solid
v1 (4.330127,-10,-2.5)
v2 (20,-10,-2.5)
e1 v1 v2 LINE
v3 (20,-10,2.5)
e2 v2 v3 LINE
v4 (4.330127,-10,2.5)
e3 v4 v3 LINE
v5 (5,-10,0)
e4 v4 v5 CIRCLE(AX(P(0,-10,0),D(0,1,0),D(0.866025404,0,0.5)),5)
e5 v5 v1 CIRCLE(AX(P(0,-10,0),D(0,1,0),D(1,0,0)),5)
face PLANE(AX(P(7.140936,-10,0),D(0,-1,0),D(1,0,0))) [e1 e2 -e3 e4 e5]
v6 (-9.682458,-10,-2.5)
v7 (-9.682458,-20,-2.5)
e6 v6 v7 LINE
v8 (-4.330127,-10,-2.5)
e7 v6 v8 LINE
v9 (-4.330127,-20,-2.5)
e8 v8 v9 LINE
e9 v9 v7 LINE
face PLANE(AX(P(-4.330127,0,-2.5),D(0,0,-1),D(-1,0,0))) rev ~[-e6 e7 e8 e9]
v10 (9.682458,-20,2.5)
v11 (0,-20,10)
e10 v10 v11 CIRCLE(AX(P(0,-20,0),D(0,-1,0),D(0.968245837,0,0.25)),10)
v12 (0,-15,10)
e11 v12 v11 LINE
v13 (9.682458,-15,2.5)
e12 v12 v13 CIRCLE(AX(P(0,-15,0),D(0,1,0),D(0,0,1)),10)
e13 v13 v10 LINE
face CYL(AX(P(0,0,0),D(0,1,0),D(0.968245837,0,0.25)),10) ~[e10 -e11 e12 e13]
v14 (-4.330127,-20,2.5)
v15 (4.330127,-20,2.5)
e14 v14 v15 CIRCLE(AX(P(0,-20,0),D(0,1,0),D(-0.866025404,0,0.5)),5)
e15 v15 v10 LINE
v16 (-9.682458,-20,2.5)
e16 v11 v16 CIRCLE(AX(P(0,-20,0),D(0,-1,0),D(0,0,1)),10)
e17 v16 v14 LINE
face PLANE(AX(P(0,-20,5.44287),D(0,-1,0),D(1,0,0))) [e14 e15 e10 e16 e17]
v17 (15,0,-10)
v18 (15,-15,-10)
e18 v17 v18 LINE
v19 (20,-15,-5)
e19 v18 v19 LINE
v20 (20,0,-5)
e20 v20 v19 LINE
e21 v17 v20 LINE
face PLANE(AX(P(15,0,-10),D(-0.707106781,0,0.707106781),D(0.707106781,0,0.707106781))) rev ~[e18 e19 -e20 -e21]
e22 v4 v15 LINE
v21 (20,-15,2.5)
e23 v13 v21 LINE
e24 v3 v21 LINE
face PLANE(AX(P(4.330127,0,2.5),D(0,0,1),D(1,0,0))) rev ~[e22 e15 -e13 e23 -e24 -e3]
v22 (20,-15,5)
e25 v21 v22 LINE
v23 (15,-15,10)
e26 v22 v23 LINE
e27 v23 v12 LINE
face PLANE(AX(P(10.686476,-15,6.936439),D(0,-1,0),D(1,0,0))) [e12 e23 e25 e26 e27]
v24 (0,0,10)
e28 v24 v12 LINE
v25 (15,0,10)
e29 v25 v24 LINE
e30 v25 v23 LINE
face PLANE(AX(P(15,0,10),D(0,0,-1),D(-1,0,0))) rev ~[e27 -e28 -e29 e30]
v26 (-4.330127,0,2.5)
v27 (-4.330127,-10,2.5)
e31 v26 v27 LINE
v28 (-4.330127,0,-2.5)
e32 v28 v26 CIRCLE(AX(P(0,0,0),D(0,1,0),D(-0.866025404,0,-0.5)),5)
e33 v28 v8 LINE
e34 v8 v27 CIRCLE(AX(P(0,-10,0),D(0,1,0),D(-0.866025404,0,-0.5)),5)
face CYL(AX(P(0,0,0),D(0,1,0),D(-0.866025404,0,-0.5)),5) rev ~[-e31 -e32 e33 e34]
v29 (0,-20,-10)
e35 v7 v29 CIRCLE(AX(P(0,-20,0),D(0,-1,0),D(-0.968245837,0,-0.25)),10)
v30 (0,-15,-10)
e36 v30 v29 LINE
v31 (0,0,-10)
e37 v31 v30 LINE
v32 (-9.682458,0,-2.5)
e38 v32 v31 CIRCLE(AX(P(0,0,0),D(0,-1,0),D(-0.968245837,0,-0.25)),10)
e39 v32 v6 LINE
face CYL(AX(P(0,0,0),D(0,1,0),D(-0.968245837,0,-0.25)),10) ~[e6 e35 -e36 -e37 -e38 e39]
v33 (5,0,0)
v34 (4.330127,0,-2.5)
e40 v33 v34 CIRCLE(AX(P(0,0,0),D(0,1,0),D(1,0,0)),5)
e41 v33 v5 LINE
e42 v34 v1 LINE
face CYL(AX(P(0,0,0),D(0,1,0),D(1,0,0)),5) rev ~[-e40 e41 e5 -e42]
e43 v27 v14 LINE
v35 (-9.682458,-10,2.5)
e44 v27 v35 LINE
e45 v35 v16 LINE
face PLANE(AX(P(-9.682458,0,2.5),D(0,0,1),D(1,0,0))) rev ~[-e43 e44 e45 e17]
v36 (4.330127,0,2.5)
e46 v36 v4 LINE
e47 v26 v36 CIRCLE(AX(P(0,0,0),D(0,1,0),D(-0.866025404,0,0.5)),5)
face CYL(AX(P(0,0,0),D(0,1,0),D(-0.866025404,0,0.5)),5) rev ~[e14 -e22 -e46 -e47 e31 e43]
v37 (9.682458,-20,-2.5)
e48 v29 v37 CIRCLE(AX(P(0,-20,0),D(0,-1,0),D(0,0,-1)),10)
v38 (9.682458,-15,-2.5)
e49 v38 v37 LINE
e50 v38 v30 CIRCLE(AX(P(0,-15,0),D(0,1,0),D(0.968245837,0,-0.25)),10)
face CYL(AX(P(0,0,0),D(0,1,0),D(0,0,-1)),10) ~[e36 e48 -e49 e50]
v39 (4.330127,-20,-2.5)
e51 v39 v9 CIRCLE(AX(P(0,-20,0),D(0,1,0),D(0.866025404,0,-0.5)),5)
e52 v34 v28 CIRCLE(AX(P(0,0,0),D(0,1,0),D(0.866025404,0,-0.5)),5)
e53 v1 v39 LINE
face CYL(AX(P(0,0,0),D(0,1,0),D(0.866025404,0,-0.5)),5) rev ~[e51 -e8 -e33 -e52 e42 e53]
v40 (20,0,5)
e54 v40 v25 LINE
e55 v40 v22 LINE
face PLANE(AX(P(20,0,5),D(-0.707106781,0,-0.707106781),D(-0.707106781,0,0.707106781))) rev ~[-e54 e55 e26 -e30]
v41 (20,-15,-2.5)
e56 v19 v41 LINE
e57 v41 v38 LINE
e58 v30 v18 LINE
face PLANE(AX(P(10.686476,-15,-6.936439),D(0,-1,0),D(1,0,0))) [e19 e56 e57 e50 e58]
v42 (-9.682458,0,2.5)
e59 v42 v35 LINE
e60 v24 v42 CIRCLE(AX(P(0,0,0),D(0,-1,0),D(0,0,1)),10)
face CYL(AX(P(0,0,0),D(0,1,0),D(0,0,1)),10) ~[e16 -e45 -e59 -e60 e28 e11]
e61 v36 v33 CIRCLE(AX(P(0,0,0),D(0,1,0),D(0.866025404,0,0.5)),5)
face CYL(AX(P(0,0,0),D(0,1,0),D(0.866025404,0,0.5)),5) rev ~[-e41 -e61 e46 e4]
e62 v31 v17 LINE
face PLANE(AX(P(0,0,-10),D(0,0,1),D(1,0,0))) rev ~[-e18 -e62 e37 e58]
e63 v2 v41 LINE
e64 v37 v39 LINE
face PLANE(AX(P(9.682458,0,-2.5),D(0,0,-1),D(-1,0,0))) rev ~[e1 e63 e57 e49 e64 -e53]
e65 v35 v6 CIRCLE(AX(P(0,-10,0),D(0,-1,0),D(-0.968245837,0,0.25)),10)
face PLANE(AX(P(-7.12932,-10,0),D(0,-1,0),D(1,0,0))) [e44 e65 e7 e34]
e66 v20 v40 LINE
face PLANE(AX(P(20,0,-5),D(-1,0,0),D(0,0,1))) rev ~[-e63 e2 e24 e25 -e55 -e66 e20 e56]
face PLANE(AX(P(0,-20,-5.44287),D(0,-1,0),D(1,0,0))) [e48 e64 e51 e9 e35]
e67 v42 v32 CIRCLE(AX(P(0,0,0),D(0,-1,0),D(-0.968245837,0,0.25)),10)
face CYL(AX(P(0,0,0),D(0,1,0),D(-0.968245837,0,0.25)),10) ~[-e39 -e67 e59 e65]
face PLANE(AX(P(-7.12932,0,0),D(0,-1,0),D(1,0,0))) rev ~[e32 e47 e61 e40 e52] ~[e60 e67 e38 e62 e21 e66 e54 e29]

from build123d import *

# Parameters (mm, degrees)
F1_DEPTH = 15
F2_DEPTH = 10
F3_DEPTH = 15
F4_DEPTH = 10
F5_DEPTH = 20
F6_DEPTH = 10


with BuildPart() as f1:
    # F0 (on Front) → F1 (new body)
    with BuildSketch(Plane.XZ):
        with BuildLine():
            ThreePointArc((0, 10), (6.123724357, 7.9056941504), (9.6824583655, 2.5))
            Line((9.6824583655, 2.5), (20, 2.5))
            Line((20, 2.5), (20, 5))
            Line((20, 5), (15, 10))
            Line((15, 10), (0, 10))
        make_face()
    extrude(amount=F1_DEPTH)

    # F0 (on Front) → F2 (join)
    with BuildSketch(Plane.XZ):
        with BuildLine():
            Line((20, 2.5), (9.6824583655, 2.5))
            ThreePointArc((9.6824583655, 2.5), (9.9202969627, 1.2600429248), (10, 0))
            ThreePointArc((10, 0), (9.9202969627, -1.2600429248), (9.6824583655, -2.5))
            Line((9.6824583655, -2.5), (20, -2.5))
            Line((20, -2.5), (20, 2.5))
        make_face()
    extrude(amount=F2_DEPTH)

    # F0 (on Front) → F3 (join)
    with BuildSketch(Plane.XZ):
        with BuildLine():
            Line((20, -2.5), (9.6824583655, -2.5))
            ThreePointArc((9.6824583655, -2.5), (6.123724357, -7.9056941504), (0, -10))
            Line((0, -10), (15, -10))
            Line((15, -10), (20, -5))
            Line((20, -5), (20, -2.5))
        make_face()
    extrude(amount=F3_DEPTH)

    # F0 (on Front) → F4 (join)
    with BuildSketch(Plane.XZ):
        with BuildLine():
            ThreePointArc((4.3301270189, 2.5), (4.8296291314, 1.2940952255), (5, 0))
            ThreePointArc((5, 0), (4.8296291314, -1.2940952255), (4.3301270189, -2.5))
            Line((4.3301270189, -2.5), (9.6824583655, -2.5))
            ThreePointArc((9.6824583655, -2.5), (9.9202969627, -1.2600429248), (10, 0))
            ThreePointArc((10, 0), (9.9202969627, 1.2600429248), (9.6824583655, 2.5))
            Line((9.6824583655, 2.5), (4.3301270189, 2.5))
        make_face()
    extrude(amount=F4_DEPTH)

    # F0 (on Front) → F5 (join)
    with BuildSketch(Plane.XZ):
        with BuildLine():
            ThreePointArc((-4.3301270189, 2.5), (0, 5), (4.3301270189, 2.5))
            Line((4.3301270189, 2.5), (9.6824583655, 2.5))
            ThreePointArc((9.6824583655, 2.5), (6.123724357, 7.9056941504), (0, 10))
            ThreePointArc((0, 10), (-6.123724357, 7.9056941504), (-9.6824583655, 2.5))
            Line((-9.6824583655, 2.5), (-4.3301270189, 2.5))
        make_face()
        with BuildLine():
            Line((9.6824583655, -2.5), (4.3301270189, -2.5))
            ThreePointArc((4.3301270189, -2.5), (0, -5), (-4.3301270189, -2.5))
            Line((-4.3301270189, -2.5), (-9.6824583655, -2.5))
            ThreePointArc((-9.6824583655, -2.5), (-6.123724357, -7.9056941504), (0, -10))
            ThreePointArc((0, -10), (6.123724357, -7.9056941504), (9.6824583655, -2.5))
        make_face()
    extrude(amount=F5_DEPTH)

    # F0 (on Front) → F6 (join)
    with BuildSketch(Plane.XZ):
        with BuildLine():
            ThreePointArc((-4.3301270189, -2.5), (-5, 0), (-4.3301270189, 2.5))
            Line((-4.3301270189, 2.5), (-9.6824583655, 2.5))
            ThreePointArc((-9.6824583655, 2.5), (-10, 0), (-9.6824583655, -2.5))
            Line((-9.6824583655, -2.5), (-4.3301270189, -2.5))
        make_face()
    extrude(amount=F6_DEPTH)


solid = f1.part
